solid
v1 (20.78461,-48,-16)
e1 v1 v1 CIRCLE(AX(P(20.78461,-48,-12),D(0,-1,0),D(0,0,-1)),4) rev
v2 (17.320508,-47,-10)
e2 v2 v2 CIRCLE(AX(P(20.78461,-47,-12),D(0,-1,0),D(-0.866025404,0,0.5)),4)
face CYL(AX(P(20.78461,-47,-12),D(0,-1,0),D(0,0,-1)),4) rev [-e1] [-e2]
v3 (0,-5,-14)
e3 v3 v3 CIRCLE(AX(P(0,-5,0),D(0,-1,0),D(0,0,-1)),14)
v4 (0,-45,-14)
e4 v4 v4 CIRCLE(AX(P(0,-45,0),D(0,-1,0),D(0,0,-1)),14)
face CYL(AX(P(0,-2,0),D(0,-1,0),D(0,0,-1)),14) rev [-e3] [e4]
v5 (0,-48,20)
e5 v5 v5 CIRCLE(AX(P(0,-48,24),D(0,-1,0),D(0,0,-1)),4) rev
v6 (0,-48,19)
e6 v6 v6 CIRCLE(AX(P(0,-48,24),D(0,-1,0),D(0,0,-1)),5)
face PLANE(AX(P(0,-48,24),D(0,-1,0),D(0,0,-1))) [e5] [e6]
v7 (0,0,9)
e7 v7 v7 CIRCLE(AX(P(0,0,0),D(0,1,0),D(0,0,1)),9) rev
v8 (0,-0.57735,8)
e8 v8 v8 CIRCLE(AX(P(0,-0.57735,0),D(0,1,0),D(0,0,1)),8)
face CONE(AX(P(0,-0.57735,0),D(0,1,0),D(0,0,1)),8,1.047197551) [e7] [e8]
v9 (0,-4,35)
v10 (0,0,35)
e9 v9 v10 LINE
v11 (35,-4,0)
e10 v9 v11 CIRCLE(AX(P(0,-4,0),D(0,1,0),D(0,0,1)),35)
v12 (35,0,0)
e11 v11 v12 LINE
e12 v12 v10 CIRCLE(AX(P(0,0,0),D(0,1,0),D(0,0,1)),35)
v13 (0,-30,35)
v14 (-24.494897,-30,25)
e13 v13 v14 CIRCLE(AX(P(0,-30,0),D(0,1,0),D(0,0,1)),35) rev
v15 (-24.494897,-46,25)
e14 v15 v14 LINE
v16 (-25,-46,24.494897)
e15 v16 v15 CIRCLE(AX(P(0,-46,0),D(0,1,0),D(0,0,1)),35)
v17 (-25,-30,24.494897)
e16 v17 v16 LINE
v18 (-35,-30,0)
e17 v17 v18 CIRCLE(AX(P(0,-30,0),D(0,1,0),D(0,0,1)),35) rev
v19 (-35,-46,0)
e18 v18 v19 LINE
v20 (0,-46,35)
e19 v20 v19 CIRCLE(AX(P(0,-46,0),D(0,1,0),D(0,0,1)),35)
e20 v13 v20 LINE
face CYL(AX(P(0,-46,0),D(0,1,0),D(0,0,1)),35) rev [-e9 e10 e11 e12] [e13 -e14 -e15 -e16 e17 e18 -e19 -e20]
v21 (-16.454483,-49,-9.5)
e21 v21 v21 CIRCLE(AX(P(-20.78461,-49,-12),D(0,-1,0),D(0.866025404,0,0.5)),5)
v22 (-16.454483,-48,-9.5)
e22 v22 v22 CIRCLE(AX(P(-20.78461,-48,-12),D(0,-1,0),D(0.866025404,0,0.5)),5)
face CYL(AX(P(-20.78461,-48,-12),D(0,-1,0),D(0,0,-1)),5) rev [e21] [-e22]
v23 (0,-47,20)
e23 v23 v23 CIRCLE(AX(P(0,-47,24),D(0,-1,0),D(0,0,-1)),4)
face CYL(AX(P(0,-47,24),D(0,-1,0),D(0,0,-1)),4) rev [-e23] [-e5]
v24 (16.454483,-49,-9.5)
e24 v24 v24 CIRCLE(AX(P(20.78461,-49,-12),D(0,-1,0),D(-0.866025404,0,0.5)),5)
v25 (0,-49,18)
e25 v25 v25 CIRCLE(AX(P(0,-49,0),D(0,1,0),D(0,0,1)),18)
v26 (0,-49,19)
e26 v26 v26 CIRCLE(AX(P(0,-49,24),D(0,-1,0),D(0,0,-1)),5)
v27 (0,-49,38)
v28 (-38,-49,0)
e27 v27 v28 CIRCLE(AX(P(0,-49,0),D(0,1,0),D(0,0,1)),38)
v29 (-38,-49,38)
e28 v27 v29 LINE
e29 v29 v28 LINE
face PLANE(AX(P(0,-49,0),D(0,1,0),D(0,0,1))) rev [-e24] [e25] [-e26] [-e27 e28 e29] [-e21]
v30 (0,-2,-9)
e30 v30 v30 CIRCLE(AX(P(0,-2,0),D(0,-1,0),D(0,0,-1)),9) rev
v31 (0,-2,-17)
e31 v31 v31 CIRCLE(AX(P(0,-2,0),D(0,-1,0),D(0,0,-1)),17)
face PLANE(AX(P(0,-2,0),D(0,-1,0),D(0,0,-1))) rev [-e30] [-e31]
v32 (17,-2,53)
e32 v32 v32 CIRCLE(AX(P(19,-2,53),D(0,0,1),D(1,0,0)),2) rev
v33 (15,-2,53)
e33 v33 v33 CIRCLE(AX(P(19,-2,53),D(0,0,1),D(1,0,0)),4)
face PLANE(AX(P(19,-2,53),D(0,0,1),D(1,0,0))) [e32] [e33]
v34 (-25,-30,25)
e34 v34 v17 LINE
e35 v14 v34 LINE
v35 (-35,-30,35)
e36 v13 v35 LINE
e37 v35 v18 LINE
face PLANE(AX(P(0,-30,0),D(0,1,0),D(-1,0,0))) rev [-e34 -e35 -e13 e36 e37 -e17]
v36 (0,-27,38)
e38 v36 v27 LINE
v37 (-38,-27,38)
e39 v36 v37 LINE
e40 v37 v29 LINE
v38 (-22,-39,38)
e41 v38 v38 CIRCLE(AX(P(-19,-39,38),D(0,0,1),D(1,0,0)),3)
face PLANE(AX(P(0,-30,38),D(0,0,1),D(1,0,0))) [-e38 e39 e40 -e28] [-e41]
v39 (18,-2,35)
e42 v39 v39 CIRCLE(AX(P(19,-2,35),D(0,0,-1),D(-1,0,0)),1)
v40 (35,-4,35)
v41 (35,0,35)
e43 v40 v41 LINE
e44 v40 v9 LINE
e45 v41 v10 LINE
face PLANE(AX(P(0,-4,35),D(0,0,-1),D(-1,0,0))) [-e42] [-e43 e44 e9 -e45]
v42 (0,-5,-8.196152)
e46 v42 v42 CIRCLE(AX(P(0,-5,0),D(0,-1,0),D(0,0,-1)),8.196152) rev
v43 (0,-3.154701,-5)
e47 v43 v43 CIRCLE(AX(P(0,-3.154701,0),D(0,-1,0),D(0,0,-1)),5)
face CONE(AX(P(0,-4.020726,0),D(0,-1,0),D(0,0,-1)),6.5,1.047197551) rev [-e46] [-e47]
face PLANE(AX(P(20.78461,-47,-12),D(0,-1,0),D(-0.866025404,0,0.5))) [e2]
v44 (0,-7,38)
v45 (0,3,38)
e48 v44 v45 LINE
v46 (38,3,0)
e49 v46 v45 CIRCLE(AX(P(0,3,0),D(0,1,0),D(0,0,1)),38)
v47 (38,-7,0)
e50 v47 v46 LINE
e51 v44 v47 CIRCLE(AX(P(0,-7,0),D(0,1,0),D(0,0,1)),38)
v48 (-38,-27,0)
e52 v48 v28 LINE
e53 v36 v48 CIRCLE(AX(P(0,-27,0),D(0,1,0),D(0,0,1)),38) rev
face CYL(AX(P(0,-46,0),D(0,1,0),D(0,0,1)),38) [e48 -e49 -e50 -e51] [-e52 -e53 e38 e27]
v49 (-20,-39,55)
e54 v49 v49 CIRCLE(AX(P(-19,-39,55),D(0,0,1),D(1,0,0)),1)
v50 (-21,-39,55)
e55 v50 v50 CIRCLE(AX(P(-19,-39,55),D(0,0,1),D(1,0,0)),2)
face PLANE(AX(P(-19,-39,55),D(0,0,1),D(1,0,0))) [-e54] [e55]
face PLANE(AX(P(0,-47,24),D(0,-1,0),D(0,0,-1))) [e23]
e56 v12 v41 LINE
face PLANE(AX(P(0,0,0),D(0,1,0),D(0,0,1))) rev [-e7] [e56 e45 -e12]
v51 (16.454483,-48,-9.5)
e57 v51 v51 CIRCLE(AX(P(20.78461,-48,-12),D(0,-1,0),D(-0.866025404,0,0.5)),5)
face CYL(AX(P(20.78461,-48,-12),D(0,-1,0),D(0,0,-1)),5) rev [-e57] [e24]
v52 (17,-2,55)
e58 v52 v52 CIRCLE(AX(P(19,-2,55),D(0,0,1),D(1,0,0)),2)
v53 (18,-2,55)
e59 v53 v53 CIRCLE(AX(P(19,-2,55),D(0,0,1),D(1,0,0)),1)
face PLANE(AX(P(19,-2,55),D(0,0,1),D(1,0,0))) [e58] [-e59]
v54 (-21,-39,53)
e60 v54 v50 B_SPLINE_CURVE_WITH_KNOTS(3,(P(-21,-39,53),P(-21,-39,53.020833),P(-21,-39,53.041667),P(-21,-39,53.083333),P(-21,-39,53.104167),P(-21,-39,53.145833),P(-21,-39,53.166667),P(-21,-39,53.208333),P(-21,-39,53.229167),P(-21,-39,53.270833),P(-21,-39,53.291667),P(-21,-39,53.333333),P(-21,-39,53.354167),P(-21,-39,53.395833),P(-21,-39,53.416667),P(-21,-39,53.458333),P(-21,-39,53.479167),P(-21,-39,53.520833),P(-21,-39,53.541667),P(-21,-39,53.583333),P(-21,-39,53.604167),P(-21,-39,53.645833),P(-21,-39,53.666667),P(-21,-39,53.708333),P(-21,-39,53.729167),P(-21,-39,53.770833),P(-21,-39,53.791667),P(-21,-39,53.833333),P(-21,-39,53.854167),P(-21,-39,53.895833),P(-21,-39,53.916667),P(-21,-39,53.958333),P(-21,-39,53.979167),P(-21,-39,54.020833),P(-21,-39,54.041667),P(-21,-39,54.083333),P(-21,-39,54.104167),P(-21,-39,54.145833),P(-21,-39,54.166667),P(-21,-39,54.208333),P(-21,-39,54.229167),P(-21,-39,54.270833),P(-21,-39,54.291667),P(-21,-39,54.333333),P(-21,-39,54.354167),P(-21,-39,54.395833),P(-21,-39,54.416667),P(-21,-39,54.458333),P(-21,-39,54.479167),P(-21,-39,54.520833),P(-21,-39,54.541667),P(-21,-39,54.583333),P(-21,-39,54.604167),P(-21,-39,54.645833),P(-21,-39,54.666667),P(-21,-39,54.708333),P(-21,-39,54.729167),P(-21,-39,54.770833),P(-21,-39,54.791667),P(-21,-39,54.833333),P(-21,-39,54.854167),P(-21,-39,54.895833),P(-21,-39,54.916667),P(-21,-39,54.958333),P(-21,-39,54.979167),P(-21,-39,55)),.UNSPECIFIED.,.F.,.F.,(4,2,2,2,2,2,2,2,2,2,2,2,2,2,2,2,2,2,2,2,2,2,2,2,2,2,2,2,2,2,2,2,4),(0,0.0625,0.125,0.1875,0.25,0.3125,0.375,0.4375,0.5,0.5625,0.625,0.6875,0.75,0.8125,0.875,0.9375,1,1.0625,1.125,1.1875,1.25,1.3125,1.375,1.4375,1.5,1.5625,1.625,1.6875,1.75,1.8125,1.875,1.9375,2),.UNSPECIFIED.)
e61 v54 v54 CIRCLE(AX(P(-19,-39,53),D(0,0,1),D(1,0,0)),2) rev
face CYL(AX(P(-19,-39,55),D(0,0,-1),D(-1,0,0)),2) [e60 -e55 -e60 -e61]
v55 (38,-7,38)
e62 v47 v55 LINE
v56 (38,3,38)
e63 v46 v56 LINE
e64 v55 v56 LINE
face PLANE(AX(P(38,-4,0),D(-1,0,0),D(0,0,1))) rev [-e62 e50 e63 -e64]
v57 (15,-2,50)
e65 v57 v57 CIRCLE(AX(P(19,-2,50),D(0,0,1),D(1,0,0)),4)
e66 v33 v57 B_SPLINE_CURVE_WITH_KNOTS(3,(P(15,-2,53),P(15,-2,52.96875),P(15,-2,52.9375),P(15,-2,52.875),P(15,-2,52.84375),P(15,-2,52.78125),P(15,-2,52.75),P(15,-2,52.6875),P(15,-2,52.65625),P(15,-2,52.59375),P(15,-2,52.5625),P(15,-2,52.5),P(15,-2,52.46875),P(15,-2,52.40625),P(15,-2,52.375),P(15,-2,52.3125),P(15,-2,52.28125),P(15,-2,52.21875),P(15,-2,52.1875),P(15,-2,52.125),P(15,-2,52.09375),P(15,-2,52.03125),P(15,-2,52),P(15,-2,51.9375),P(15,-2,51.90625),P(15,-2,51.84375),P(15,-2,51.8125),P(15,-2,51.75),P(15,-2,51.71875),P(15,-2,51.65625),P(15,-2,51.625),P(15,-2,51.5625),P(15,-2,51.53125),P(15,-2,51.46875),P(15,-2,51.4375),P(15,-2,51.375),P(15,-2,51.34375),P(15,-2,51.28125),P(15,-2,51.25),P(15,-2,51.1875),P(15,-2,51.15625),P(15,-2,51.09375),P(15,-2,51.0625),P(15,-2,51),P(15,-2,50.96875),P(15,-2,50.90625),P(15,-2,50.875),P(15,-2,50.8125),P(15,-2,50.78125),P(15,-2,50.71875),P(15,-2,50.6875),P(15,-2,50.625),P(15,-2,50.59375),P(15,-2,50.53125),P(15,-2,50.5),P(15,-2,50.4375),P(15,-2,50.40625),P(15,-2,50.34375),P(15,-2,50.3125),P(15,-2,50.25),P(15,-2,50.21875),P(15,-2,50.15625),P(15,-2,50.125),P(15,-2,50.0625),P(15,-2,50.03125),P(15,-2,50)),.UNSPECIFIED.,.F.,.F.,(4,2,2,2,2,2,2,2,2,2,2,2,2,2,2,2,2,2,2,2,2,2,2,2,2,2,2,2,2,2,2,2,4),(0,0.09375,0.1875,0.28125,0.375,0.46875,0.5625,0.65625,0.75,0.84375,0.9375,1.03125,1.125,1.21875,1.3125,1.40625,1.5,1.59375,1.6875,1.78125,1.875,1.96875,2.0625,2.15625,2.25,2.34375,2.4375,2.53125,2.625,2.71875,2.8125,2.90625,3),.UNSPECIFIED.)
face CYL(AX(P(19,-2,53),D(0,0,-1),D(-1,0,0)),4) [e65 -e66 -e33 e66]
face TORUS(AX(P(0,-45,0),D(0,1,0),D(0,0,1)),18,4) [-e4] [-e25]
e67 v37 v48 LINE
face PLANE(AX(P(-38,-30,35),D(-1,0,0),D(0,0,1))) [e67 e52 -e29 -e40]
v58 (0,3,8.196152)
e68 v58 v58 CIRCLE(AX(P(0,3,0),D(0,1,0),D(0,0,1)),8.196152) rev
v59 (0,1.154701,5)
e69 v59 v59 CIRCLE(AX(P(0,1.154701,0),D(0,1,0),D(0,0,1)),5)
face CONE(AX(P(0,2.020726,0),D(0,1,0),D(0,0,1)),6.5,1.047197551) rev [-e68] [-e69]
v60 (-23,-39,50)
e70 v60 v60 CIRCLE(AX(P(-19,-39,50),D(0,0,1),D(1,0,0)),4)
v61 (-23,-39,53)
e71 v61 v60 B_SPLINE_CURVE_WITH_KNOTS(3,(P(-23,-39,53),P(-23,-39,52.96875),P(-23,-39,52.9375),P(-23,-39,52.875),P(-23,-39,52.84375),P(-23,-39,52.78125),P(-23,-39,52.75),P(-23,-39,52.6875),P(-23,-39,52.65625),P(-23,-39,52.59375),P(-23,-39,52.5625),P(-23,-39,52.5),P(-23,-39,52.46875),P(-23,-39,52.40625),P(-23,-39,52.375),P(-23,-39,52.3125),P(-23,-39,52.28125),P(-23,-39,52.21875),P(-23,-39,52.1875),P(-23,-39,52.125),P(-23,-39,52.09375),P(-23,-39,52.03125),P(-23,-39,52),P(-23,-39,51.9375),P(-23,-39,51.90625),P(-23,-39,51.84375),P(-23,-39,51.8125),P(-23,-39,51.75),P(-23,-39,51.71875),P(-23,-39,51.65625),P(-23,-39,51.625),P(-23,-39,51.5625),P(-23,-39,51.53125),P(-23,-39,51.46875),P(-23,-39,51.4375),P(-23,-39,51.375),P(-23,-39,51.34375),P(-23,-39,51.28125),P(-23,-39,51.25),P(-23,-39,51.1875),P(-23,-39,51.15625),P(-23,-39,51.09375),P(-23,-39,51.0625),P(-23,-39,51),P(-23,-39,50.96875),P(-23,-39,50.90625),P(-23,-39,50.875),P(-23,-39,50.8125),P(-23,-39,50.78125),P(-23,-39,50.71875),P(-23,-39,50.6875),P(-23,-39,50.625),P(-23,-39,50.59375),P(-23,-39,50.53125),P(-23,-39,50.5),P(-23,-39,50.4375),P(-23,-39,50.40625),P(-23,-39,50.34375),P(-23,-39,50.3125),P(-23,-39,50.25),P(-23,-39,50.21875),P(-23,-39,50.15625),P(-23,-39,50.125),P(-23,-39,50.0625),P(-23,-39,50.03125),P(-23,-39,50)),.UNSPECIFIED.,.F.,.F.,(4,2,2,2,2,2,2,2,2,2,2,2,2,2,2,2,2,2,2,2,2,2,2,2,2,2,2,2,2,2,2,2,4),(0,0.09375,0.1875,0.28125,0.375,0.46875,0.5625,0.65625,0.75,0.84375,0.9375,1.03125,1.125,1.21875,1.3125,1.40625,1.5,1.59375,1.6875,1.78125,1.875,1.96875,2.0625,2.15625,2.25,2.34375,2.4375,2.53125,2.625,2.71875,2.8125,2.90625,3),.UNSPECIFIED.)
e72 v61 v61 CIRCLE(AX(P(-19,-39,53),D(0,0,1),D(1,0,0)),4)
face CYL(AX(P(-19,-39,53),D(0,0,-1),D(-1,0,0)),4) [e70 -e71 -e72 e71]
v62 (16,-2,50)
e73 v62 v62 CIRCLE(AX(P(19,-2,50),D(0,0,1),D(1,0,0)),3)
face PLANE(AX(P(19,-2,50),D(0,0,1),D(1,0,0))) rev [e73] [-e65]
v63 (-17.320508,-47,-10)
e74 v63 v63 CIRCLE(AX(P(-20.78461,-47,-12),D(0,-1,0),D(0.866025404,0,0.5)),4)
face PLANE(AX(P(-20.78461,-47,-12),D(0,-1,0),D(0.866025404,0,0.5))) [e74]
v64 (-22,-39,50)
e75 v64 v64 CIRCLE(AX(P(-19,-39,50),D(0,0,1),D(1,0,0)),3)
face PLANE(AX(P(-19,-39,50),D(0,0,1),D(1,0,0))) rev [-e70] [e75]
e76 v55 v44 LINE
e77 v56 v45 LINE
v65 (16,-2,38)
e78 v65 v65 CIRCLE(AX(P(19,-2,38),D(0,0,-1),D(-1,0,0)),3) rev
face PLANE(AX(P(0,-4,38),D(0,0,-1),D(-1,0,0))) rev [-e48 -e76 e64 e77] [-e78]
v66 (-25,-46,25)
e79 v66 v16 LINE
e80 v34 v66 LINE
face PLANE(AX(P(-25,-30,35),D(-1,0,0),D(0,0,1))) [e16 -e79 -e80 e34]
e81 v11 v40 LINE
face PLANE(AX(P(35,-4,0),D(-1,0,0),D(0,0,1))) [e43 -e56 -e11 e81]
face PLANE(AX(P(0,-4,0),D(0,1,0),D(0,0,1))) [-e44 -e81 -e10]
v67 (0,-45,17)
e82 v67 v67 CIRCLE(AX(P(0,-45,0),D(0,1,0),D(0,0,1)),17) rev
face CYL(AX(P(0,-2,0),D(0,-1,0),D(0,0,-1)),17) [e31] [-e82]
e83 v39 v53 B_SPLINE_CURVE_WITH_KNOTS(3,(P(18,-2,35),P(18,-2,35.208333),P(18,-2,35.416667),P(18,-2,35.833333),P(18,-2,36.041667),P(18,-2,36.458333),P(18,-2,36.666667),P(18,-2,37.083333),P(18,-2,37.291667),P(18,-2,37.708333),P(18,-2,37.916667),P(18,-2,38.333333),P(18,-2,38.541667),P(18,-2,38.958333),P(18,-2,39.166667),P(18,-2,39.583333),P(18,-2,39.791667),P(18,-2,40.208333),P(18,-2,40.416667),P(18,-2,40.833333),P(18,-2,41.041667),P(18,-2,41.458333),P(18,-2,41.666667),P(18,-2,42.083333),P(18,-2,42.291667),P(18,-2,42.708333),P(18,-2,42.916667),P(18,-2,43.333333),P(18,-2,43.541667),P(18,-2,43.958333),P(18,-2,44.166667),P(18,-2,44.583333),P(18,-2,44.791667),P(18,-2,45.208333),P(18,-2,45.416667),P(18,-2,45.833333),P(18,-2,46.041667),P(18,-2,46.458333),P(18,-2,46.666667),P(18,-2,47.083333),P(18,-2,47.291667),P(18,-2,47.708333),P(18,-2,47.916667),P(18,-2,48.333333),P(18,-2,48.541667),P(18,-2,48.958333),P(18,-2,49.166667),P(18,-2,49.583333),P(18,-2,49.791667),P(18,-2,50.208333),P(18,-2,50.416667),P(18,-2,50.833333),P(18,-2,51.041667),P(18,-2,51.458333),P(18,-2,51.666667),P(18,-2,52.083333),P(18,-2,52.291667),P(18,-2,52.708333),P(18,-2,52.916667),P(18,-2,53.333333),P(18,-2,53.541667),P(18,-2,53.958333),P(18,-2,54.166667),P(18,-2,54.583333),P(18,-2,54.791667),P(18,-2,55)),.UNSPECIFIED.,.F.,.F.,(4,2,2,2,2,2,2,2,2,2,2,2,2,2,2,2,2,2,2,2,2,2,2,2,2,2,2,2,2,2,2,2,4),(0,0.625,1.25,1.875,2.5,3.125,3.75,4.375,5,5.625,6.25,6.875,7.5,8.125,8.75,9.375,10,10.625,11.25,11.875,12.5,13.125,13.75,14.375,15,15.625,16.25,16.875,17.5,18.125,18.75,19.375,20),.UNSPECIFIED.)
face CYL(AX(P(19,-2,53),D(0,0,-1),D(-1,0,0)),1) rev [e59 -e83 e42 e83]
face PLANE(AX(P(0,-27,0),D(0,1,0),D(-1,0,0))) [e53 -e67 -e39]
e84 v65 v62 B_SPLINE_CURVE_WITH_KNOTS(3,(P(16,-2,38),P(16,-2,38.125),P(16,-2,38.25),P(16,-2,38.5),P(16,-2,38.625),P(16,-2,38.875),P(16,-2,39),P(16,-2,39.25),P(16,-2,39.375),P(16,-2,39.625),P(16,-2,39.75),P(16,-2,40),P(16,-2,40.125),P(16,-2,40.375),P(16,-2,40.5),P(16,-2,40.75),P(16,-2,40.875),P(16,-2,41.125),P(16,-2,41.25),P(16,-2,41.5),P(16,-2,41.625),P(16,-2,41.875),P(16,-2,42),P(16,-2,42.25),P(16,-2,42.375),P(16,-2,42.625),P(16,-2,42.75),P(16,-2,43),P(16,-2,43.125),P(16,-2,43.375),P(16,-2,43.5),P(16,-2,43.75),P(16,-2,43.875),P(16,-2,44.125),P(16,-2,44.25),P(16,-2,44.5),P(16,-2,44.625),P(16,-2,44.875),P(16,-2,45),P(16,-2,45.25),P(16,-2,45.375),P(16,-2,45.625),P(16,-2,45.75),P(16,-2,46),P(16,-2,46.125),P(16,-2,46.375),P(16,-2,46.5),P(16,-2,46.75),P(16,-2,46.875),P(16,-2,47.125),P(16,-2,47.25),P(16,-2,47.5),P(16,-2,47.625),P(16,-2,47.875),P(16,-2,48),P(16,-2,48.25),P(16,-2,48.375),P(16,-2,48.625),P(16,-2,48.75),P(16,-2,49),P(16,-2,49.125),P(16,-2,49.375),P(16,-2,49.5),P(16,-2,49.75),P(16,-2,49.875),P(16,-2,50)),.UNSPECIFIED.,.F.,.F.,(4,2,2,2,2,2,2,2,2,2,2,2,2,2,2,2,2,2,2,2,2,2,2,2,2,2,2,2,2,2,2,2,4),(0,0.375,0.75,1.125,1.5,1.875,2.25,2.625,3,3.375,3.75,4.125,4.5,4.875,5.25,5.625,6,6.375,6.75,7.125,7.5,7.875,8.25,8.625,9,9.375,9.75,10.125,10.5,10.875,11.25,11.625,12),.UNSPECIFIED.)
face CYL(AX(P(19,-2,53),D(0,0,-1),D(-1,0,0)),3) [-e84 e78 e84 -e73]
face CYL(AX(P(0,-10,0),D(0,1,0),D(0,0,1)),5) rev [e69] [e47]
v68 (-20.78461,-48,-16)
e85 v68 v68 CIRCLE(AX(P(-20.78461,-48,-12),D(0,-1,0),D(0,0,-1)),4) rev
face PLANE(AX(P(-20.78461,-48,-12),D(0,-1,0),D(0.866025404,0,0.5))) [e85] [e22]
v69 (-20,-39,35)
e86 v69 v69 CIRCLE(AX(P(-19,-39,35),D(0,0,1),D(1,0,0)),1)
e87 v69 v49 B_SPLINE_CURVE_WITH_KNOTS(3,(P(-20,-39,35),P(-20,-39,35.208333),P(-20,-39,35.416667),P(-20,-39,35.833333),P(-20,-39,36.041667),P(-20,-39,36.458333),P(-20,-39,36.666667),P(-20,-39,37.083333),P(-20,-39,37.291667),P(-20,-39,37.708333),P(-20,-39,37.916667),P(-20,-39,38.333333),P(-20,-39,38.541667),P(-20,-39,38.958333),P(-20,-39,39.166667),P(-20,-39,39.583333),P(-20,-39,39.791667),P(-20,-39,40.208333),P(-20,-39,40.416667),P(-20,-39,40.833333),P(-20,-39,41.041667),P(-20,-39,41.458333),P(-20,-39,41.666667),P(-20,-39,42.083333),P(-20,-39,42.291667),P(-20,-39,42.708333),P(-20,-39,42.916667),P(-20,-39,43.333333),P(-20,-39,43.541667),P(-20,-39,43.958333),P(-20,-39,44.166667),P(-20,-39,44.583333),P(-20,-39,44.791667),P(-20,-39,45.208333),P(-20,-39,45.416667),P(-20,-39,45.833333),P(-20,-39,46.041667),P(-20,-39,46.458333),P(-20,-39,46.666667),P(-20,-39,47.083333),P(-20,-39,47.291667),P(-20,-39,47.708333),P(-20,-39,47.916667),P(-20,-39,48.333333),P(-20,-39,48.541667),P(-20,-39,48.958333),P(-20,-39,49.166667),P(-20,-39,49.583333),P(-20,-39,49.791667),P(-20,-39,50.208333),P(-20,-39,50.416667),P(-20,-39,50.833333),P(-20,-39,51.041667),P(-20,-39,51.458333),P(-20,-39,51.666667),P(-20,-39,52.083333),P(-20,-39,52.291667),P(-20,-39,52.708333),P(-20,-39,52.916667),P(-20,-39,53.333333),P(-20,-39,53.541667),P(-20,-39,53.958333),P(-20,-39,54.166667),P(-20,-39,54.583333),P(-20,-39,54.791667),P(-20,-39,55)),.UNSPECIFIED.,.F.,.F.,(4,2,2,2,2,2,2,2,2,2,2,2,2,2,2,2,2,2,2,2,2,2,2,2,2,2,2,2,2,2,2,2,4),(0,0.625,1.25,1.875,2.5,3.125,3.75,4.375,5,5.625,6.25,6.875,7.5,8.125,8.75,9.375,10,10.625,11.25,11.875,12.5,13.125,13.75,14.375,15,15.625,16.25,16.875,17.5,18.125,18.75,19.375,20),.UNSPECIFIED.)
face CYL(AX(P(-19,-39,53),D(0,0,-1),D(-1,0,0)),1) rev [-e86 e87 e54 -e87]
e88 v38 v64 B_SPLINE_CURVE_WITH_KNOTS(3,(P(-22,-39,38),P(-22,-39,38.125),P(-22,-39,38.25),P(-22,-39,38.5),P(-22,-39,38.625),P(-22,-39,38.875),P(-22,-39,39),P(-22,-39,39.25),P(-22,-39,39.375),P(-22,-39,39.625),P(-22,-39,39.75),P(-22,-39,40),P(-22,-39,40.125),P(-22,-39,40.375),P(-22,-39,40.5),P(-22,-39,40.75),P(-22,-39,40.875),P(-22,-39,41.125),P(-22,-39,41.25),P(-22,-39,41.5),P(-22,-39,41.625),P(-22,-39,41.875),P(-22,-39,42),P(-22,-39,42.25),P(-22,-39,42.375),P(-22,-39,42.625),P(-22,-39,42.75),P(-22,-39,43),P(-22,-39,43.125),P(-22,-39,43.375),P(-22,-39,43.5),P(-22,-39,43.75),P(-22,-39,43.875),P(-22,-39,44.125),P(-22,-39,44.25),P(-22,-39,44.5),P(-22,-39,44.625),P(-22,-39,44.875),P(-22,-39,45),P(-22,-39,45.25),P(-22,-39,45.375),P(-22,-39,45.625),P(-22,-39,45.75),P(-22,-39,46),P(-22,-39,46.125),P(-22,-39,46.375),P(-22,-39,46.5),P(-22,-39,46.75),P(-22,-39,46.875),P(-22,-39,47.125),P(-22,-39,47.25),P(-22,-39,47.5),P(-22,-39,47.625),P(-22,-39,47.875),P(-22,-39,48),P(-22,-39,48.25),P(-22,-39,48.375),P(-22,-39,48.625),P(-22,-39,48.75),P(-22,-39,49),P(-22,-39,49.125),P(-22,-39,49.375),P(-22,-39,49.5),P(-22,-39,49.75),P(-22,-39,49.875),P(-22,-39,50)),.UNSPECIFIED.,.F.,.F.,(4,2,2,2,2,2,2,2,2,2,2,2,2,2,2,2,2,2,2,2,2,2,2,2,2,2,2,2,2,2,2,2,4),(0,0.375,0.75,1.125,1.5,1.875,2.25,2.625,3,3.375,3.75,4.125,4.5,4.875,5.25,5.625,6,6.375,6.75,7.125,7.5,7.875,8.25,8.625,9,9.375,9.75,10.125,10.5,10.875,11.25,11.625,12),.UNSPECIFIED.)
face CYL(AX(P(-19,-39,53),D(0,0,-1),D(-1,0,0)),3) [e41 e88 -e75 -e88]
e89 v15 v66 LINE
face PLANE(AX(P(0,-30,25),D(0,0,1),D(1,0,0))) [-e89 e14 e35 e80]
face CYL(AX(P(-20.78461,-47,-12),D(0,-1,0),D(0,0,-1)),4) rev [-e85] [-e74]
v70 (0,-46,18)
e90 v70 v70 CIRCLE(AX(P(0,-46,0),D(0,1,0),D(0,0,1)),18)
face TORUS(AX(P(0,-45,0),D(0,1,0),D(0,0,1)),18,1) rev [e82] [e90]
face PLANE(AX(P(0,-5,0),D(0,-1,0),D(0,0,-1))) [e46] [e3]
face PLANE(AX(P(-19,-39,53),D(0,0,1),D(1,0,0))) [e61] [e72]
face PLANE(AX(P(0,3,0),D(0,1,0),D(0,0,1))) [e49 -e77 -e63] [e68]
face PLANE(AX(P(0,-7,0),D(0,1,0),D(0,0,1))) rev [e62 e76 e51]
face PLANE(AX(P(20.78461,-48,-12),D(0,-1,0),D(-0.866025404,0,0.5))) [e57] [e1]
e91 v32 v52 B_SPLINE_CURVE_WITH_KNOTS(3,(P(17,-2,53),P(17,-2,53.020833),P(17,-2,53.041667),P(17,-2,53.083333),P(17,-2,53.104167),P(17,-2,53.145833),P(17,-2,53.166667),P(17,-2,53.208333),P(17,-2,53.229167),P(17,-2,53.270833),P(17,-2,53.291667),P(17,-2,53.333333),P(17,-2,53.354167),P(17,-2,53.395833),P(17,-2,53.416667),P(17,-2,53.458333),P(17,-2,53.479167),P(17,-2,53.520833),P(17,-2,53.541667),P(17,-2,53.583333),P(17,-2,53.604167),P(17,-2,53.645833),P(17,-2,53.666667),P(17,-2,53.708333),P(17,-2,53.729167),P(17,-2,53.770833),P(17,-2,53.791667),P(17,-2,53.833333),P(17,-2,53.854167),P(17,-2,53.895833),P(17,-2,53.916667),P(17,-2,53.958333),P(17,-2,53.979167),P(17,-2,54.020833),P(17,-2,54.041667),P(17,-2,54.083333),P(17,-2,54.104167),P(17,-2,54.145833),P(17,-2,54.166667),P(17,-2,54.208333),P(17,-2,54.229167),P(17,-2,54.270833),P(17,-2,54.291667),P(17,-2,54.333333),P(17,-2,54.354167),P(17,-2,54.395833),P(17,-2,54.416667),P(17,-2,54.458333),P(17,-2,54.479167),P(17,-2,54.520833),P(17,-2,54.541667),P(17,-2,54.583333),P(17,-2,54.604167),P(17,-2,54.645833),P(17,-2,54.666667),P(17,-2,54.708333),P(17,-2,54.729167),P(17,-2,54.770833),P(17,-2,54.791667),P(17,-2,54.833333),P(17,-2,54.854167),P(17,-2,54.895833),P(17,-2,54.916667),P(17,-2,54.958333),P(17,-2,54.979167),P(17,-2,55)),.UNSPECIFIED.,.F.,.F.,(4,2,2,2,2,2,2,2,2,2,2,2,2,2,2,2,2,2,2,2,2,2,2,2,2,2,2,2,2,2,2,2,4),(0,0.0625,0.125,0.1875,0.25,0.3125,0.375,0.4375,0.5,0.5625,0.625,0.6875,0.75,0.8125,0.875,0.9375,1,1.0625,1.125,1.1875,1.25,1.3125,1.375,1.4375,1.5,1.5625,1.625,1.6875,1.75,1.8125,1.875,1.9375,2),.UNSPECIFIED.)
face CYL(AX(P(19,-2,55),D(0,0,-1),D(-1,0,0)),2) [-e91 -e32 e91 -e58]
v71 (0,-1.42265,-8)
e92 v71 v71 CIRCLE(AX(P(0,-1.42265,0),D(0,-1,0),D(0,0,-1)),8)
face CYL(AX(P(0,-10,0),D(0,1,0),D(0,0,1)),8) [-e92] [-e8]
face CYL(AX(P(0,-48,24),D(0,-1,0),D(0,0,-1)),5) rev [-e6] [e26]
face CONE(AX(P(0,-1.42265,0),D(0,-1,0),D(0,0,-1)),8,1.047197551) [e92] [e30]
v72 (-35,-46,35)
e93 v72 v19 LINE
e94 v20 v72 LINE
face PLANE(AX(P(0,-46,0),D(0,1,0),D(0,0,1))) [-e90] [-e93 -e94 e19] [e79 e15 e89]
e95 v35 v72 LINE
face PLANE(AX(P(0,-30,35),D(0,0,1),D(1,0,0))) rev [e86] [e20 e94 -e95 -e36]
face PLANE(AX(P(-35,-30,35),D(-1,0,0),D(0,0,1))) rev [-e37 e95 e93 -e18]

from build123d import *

# Parameters (mm, degrees)
SKETCH1_R            = 35
BOSS_EXTRUDE1_DEPTH  = 46
BOSS_EXTRUDE2_DEPTH  = 4
EXTRUDE_THIN1_DEPTH  = 16
SKETCH9_R            = 17
CUT_EXTRUDE1_DEPTH   = 44
SKETCH10_R           = 8
CUT_EXTRUDE2_DEPTH   = 10
CHAMFER1_SIZE        = 1
CHAMFER1_SIZE2       = 0.577350269
CHAMFER2_SIZE        = 1
CHAMFER2_SIZE2       = 0.577350269
FILLET1_R            = 1
SHELL2_START         = -49
SHELL2_OUTLINE_R     = 38
SHELL2_OUTLINE_R_2   = 14
SHELL2_DEPTH         = 52
SHELL2_2_DEPTH       = 22
SHELL2_START_2       = -5
SHELL2_3_OUTLINE_R   = 14
SHELL2_3_OUTLINE_R_2 = 5
SHELL2_3_DEPTH       = 8
SHELL2_START_3       = -7
SHELL2_4_DEPTH       = 2
SHELL2_START_4       = -45.0000001
SHELL2_5_OUTLINE_R   = 35
SHELL2_5_OUTLINE_R_2 = 17
SHELL2_5_DEPTH       = 45.0000001
SHELL2_START_5       = -46
SHELL2_6_DEPTH       = 16
SHELL2_START_6       = -4
SHELL2_7_DEPTH       = 4
SHELL2_START_7       = -1.422649831
SHELL2_8_OUTLINE_R   = 17
SHELL2_8_OUTLINE_R_2 = 8
SHELL2_8_DEPTH       = 0.845299462
SKETCH15_R           = 4
CUT_EXTRUDE5_DEPTH   = 2
SKETCH18_R           = 5
CUT_EXTRUDE6_DEPTH   = 1
CIRPATTERN4_COUNT    = 3
SKETCH24_R           = 3
SKETCH24_R_2         = 1
EXTRUDE_THIN2_DEPTH  = 15
CUT_EXTRUDE7_START   = -10
SKETCH24_2_R         = 1
CUT_EXTRUDE7_DEPTH   = 10
SKETCH27_R           = 4
SKETCH27_R_2         = 3
EXTRUDE_THIN3_DEPTH  = 3
SKETCH30_R           = 2
SKETCH30_R_2         = 1
EXTRUDE_THIN5_DEPTH  = 5
SKETCH28_R           = 4
SKETCH28_R_2         = 3
EXTRUDE_THIN6_DEPTH  = 3
SKETCH31_R           = 2
SKETCH31_R_2         = 1
EXTRUDE_THIN7_DEPTH  = 5


with BuildPart() as part:
    # Sketch1 → Boss-Extrude1 (new body)
    with BuildSketch(Plane(origin=(0, 0, 0), x_dir=(1, 0, 0), z_dir=(0, 1, 0))):
        with Locations(Location((0, 0, 0), (0, 0, 270))):
            Circle(SKETCH1_R)
    extrude(amount=-BOSS_EXTRUDE1_DEPTH)

    # Sketch1<3> → Boss-Extrude2 (add)
    with BuildSketch(Plane(origin=(0, 0, 0), x_dir=(1, 0, 0), z_dir=(0, 1, 0))):
        with BuildLine():
            Line((35, -35), (35, 0))
            ThreePointArc((35, 0), (24.748737342, -24.748737342), (0, -35))
            Line((0, -35), (35, -35))
        make_face()
    extrude(amount=-BOSS_EXTRUDE2_DEPTH)

    # Sketch5 → Extrude-Thin1 (add)
    with BuildSketch(Plane.XZ.offset(46)):
        Polygon((0, 35), (-35, 35), (-35, 0), (-25, 0), (-25, 25), (0, 25), align=None)
    extrude(amount=-EXTRUDE_THIN1_DEPTH)

    # Sketch9 → Cut-Extrude1 (cut)
    with BuildSketch(Plane.XZ.offset(46)):
        with Locations(Location((0, 0, 0), (0, 0, 270))):
            Circle(SKETCH9_R)
    extrude(amount=-CUT_EXTRUDE1_DEPTH, mode=Mode.SUBTRACT)

    # Sketch10 → Cut-Extrude2 (cut)
    with BuildSketch(Plane(origin=(0, 0, 0), x_dir=(1, 0, 0), z_dir=(0, 1, 0))):
        with Locations(Location((0, 0, 0), (0, 0, 270))):
            Circle(SKETCH10_R)
    extrude(amount=-CUT_EXTRUDE2_DEPTH, mode=Mode.SUBTRACT)

    # Chamfer1
    chamfer1_edges = [part.edges().sort_by_distance(p)[0] for p in [
        (0, 0, -8),
    ]]
    chamfer1_side = [part.faces().sort_by_distance(p)[0] for p in [
        (-24.048737342, 0, -24.048737342),
    ]]
    chamfer(chamfer1_edges, length=CHAMFER1_SIZE, length2=CHAMFER1_SIZE2, reference=chamfer1_side[0])

    # Chamfer2
    chamfer2_edges = [part.edges().sort_by_distance(p)[0] for p in [
        (0, -2, -8),
    ]]
    chamfer2_side = [part.faces().sort_by_distance(p)[0] for p in [
        (0, -2, 16.519167389),
    ]]
    chamfer(chamfer2_edges, length=CHAMFER2_SIZE, length2=CHAMFER2_SIZE2, reference=chamfer2_side[0])

    # Fillet1
    fillet1_edges = [part.edges().sort_by_distance(p)[0] for p in [
        (0, -46, 17),
    ]]
    fillet(fillet1_edges, radius=FILLET1_R)

    # Shell2: read off the stored shape, not the designer's step
    # Shell2 outline → Shell2 (add)
    with BuildSketch(Plane(origin=(0, 0, 0), x_dir=(1, 0, 0), z_dir=(0, 1, 0)).offset(SHELL2_START)):
        Circle(SHELL2_OUTLINE_R)
        Circle(SHELL2_OUTLINE_R_2, mode=Mode.SUBTRACT)
    extrude(amount=SHELL2_DEPTH)

    # Shell2 2 outline → Shell2 2 (add)
    with BuildSketch(Plane(origin=(0, 0, 0), x_dir=(1, 0, 0), z_dir=(0, 1, 0)).offset(SHELL2_START)):
        with BuildLine():
            ThreePointArc((0, -38), (-26.870057685, -26.870057685), (-38, 0))
            Line((-38, 0), (-38, -38))
            Line((-38, -38), (0, -38))
        make_face()
    extrude(amount=SHELL2_2_DEPTH)

    # Shell2 3 outline → Shell2 3 (add)
    # profile 1 of 2: a face of its own
    with BuildSketch(Plane(origin=(0, 0, 0), x_dir=(1, 0, 0), z_dir=(0, 1, 0)).offset(SHELL2_START_2)):
        with BuildLine():
            Line((38, -38), (38, 0))
            ThreePointArc((38, 0), (26.870057685, -26.870057685), (0, -38))
            Line((0, -38), (38, -38))
        make_face()
    # profile 2 of 2: a face of its own
    with BuildSketch(Plane(origin=(0, 0, 0), x_dir=(1, 0, 0), z_dir=(0, 1, 0)).offset(SHELL2_START_2)):
        Circle(SHELL2_3_OUTLINE_R)
        Circle(SHELL2_3_OUTLINE_R_2, mode=Mode.SUBTRACT)
    extrude(amount=SHELL2_3_DEPTH)

    # Shell2 4 outline → Shell2 4 (add)
    with BuildSketch(Plane(origin=(0, 0, 0), x_dir=(1, 0, 0), z_dir=(0, 1, 0)).offset(SHELL2_START_3)):
        with BuildLine():
            Line((38, -38), (38, 0))
            ThreePointArc((38, 0), (26.870057685, -26.870057685), (0, -38))
            Line((0, -38), (38, -38))
        make_face()
    extrude(amount=SHELL2_4_DEPTH)

    # Shell2 5 outline → Shell2 5 (cut)
    with BuildSketch(Plane(origin=(0, 0, 0), x_dir=(1, 0, 0), z_dir=(0, 1, 0)).offset(SHELL2_START_4)):
        Circle(SHELL2_5_OUTLINE_R)
        Circle(SHELL2_5_OUTLINE_R_2, mode=Mode.SUBTRACT)
    extrude(amount=SHELL2_5_DEPTH, mode=Mode.SUBTRACT)

    # Shell2 6 outline → Shell2 6 (cut)
    with BuildSketch(Plane(origin=(0, 0, 0), x_dir=(1, 0, 0), z_dir=(0, 1, 0)).offset(SHELL2_START_5)):
        with BuildLine():
            ThreePointArc((-25, -24.494897428), (-32.403703492, -13.228756555), (-35, 0))
            Line((-35, 0), (-35, -35))
            Line((-35, -35), (0, -35))
            ThreePointArc((0, -35), (-13.228756555, -32.403703492), (-24.494897428, -25))
            Line((-24.494897428, -25), (-25, -25))
            Line((-25, -25), (-25, -24.494897428))
        make_face()
    extrude(amount=SHELL2_6_DEPTH, mode=Mode.SUBTRACT)

    # Shell2 7 outline → Shell2 7 (cut)
    with BuildSketch(Plane(origin=(0, 0, 0), x_dir=(1, 0, 0), z_dir=(0, 1, 0)).offset(SHELL2_START_6)):
        with BuildLine():
            Line((35, -35), (35, 0))
            ThreePointArc((35, 0), (24.748737342, -24.748737342), (0, -35))
            Line((0, -35), (35, -35))
        make_face()
    extrude(amount=SHELL2_7_DEPTH, mode=Mode.SUBTRACT)

    # Shell2 8 outline → Shell2 8 (cut)
    with BuildSketch(Plane(origin=(0, 0, 0), x_dir=(1, 0, 0), z_dir=(0, 1, 0)).offset(SHELL2_START_7)):
        Circle(SHELL2_8_OUTLINE_R)
        Circle(SHELL2_8_OUTLINE_R_2, mode=Mode.SUBTRACT)
    extrude(amount=SHELL2_8_DEPTH, mode=Mode.SUBTRACT)

    # Shell2 9 outline → Shell2 9 (revolve, cut)
    with BuildSketch(Plane.XY):
        Polygon((5, 3), (5, 1.154700538), (8.196152423, 3), align=None)
        Polygon((17, -0.577350369), (17, 0), (9, 0), (8, -0.577350319), align=None)
        Polygon((8, -1.422649781), (9, -2), (17, -2), (17, -1.422649831), align=None)
        Polygon((8.196152423, -5), (5, -3.154700538), (5, -5), align=None)
        with BuildLine():
            Line((14, -45), (14, -49))
            Line((14, -49), (18, -49))
            ThreePointArc((18, -49), (15.171572875, -47.828427125), (14, -45))
        make_face()
        with BuildLine():
            ThreePointArc((17, -45), (17.292893219, -45.707106781), (18, -46))
            Line((18, -46), (35, -46))
            Line((35, -46), (35, -45.0000001))
            Line((35, -45.0000001), (17, -45))
        make_face()
    revolve(axis=Axis((0, 0, 0), (0, 1, 0)), mode=Mode.SUBTRACT)

    # Sketch15 → Cut-Extrude5 (cut)
    with BuildSketch(Plane.XZ.offset(49)):
        with Locations(Location((0, 24, 0), (0, 0, 270))):
            Circle(SKETCH15_R)
    cut_extrude5 = extrude(amount=-CUT_EXTRUDE5_DEPTH, mode=Mode.SUBTRACT)

    # Sketch18 → Cut-Extrude6 (cut)
    with BuildSketch(Plane.XZ.offset(49)):
        with Locations(Location((0, 24, 0), (0, 0, 270))):
            Circle(SKETCH18_R)
    cut_extrude6 = extrude(amount=-CUT_EXTRUDE6_DEPTH, mode=Mode.SUBTRACT)

    # CirPattern4: Cut-Extrude5, Cut-Extrude6 ×3 about axis
    cirpattern4_axis = Axis((0, 0, 0), (0, 1, 0))
    add([cut_extrude5.rotate(cirpattern4_axis, i * 360 / CIRPATTERN4_COUNT) for i in range(1, CIRPATTERN4_COUNT)], mode=Mode.SUBTRACT)
    add([cut_extrude6.rotate(cirpattern4_axis, i * 360 / CIRPATTERN4_COUNT) for i in range(1, CIRPATTERN4_COUNT)], mode=Mode.SUBTRACT)

    # Sketch24 → Extrude-Thin2 (add)
    # profile 1 of 2: a face of its own
    with BuildSketch(Plane.XY.offset(38)):
        with Locations((-19, -39)):
            Circle(SKETCH24_R)
        with Locations((-19, -39)):
            Circle(SKETCH24_R_2, mode=Mode.SUBTRACT)
    # profile 2 of 2: a face of its own
    with BuildSketch(Plane.XY.offset(38)):
        with Locations((19, -2)):
            Circle(SKETCH24_R)
        with Locations((19, -2)):
            Circle(SKETCH24_R_2, mode=Mode.SUBTRACT)
    extrude(amount=EXTRUDE_THIN2_DEPTH)

    # Sketch24<2> → Cut-Extrude7 (cut)
    with BuildSketch(Plane.XY.offset(38).offset(CUT_EXTRUDE7_START)):
        with Locations((-19, -39)):
            Circle(SKETCH24_2_R)
        with Locations(Location((19, -2, 0), (0, 0, 180))):
            Circle(SKETCH24_2_R)
    extrude(amount=CUT_EXTRUDE7_DEPTH, mode=Mode.SUBTRACT)

    # Sketch27 → Extrude-Thin3 (add)
    with BuildSketch(Plane.XY.offset(50)):
        with Locations((19, -2)):
            Circle(SKETCH27_R)
        with Locations((19, -2)):
            Circle(SKETCH27_R_2, mode=Mode.SUBTRACT)
    extrude(amount=EXTRUDE_THIN3_DEPTH)

    # Sketch30 → Extrude-Thin5 (add)
    with BuildSketch(Plane.XY.offset(50)):
        with Locations((19, -2)):
            Circle(SKETCH30_R)
        with Locations((19, -2)):
            Circle(SKETCH30_R_2, mode=Mode.SUBTRACT)
    extrude(amount=EXTRUDE_THIN5_DEPTH)

    # Sketch28 → Extrude-Thin6 (add)
    with BuildSketch(Plane.XY.offset(50)):
        with Locations((-19, -39)):
            Circle(SKETCH28_R)
        with Locations((-19, -39)):
            Circle(SKETCH28_R_2, mode=Mode.SUBTRACT)
    extrude(amount=EXTRUDE_THIN6_DEPTH)

    # Sketch31 → Extrude-Thin7 (add)
    with BuildSketch(Plane.XY.offset(50)):
        with Locations((-19, -39)):
            Circle(SKETCH31_R)
        with Locations((-19, -39)):
            Circle(SKETCH31_R_2, mode=Mode.SUBTRACT)
    extrude(amount=EXTRUDE_THIN7_DEPTH)


solid = part.part
